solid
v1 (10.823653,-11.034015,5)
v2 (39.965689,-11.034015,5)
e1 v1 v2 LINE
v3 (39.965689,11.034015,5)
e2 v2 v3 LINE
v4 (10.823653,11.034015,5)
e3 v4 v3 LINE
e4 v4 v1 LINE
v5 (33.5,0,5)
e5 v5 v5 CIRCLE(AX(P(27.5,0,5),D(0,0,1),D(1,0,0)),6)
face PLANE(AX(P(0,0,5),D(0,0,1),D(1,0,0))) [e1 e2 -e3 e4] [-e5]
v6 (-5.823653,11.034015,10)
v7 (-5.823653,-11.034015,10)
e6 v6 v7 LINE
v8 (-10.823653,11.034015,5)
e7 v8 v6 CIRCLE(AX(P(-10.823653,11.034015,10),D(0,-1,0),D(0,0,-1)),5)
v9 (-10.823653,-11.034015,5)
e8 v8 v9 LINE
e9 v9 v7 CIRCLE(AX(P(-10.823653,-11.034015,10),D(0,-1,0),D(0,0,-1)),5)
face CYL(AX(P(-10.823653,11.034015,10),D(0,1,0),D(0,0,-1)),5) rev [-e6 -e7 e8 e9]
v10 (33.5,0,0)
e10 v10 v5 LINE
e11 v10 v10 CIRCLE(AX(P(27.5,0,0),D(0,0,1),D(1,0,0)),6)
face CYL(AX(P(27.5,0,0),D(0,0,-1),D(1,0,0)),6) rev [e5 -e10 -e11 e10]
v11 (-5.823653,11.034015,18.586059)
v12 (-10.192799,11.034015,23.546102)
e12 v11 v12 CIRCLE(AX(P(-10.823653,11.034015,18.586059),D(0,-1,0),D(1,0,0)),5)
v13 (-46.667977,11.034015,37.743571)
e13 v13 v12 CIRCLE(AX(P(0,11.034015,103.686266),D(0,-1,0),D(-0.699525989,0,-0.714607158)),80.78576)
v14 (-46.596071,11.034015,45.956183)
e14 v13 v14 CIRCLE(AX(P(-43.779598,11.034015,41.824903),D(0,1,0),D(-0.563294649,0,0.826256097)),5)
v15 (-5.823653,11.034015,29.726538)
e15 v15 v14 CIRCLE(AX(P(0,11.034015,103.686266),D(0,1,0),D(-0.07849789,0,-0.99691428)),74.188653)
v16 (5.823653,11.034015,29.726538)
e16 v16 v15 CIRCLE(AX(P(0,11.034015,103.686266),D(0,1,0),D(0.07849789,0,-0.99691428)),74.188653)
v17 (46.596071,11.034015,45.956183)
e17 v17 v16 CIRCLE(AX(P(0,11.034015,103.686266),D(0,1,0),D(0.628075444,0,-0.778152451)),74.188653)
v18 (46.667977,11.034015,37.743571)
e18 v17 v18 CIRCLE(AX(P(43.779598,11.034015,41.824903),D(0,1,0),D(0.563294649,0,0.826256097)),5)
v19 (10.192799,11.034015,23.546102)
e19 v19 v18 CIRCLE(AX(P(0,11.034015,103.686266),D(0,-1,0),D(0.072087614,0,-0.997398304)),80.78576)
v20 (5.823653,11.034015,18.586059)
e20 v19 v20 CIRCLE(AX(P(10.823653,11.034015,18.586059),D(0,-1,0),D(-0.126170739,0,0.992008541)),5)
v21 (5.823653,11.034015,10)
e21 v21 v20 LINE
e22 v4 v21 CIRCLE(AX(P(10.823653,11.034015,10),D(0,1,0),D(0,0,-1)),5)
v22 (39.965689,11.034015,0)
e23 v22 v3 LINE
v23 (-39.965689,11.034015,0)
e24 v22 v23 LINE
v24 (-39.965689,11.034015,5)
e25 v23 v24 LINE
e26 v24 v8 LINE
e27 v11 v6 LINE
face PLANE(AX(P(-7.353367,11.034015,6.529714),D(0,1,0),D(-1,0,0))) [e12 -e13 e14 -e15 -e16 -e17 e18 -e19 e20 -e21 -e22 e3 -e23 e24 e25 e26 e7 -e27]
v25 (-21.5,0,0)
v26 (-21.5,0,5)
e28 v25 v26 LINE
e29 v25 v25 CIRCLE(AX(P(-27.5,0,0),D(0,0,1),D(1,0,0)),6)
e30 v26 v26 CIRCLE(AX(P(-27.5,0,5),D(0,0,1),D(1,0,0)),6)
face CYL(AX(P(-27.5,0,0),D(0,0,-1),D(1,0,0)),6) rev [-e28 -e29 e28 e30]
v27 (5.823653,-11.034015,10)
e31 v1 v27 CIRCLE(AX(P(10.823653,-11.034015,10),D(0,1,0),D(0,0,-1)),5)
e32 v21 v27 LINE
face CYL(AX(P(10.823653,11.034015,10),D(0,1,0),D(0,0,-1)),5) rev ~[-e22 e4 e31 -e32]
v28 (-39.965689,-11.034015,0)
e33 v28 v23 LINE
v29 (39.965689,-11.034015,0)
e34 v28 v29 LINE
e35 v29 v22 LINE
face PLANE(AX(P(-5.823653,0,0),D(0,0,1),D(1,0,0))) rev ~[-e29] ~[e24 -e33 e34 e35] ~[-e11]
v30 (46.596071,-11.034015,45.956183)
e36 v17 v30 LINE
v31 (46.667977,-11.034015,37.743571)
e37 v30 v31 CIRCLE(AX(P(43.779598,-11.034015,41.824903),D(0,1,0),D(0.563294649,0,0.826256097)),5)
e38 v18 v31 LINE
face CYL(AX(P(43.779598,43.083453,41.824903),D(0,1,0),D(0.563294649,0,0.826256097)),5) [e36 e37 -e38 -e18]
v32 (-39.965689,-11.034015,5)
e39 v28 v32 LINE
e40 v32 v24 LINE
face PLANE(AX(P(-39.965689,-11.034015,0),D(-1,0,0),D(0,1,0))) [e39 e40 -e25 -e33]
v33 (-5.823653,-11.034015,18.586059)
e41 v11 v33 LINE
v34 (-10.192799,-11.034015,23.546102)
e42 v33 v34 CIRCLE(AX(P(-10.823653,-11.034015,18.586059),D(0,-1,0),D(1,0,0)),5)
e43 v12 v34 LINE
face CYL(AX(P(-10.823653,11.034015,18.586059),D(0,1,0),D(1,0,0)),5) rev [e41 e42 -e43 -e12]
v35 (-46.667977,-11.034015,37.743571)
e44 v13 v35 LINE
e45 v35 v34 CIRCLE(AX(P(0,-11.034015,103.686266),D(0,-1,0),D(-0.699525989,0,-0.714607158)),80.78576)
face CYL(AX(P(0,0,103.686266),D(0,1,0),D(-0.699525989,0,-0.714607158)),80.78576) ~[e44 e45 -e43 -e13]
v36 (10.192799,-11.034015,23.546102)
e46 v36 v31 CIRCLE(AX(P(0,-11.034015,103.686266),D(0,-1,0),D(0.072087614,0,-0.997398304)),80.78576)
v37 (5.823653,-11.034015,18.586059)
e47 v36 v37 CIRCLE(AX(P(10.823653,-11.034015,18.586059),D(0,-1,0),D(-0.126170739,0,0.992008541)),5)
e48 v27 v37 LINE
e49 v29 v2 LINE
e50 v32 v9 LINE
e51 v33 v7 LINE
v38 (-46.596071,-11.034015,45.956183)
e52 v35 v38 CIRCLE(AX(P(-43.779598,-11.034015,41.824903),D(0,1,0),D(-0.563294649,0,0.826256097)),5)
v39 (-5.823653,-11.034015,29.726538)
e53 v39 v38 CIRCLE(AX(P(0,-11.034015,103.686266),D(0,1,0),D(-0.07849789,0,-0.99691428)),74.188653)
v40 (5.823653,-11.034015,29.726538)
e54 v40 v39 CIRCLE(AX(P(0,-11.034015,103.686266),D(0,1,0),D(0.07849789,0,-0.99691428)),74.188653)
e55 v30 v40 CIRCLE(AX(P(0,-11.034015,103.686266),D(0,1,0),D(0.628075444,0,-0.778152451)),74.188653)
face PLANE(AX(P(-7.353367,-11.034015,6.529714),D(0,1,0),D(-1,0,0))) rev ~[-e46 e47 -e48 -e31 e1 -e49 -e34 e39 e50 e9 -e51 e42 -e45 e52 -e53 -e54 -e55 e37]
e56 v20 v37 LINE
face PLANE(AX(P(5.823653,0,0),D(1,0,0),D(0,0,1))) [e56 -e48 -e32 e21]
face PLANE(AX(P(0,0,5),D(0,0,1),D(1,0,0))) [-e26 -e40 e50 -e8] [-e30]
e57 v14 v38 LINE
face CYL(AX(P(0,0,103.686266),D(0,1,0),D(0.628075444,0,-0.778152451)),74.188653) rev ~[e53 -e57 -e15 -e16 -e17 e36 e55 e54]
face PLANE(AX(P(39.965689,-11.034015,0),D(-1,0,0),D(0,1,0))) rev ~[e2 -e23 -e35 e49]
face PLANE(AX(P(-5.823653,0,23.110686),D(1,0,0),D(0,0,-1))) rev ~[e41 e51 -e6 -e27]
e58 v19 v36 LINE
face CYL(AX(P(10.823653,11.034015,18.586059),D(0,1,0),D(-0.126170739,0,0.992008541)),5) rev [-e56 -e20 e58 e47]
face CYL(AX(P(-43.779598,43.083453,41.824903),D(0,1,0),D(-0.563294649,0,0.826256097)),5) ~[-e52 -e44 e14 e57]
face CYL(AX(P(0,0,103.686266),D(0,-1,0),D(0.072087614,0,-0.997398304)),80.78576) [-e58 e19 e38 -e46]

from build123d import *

# Parameters (mm, degrees)
F0_W          = 79.9313783646
F0_H          = 22.0680292696
F0_R          = 6
F1_DEPTH      = 5
F3_DEPTH      = 11.0340146348
F3_DEPTH_BACK = 11.0340146348
F4_T1_DEPTH   = 22.0680292696
F4_T3_DEPTH   = 22.0680292696
F4_T5_DEPTH   = 22.0680292696
F4_T7_DEPTH   = 22.0680292696
F4_T9_DEPTH   = 86.1669063659
F4_T11_DEPTH  = 86.1669063659


# Not quite as in the source:
# - a fillet or chamfer that OpenCascade refuses, or shapes differently, is made with other operations: its cross-section is extruded or revolved along the edge and cut away or added


with BuildPart() as f1:
    # F0 (on Top) → F1 (new body)
    with BuildSketch(Plane.XY):
        Rectangle(F0_W, F0_H)
        with Locations((-27.5, 0)):
            Circle(F0_R, mode=Mode.SUBTRACT)
        with Locations((27.5, 0)):
            Circle(F0_R, mode=Mode.SUBTRACT)
    extrude(amount=F1_DEPTH)

    # F2 (on Front) → F3 (join, two sides)
    with BuildSketch(Plane.XZ) as f3_sk:
        with BuildLine():
            ThreePointArc((-5.8236527257, 29.7265377594), (-27.4373325166, 34.7576861994), (-46.5960713348, 45.9561832249))
            Line((-46.5960713348, 45.9561832249), (-56.5117387286, 45.9561832249))
            ThreePointArc((-56.5117387286, 45.9561832249), (-33.1949461114, 30.0355047329), (-5.8236527257, 23.1106856026))
            Line((-5.8236527257, 23.1106856026), (-5.8236527257, 29.7265377594))
        make_face()
        with BuildLine():
            ThreePointArc((5.8236527257, 29.7265377594), (0, 29.4976123348), (-5.8236527257, 29.7265377594))
            Line((-5.8236527257, 29.7265377594), (-5.8236527257, 23.1106856026))
            ThreePointArc((-5.8236527257, 23.1106856026), (0, 22.900505574), (5.8236527257, 23.1106856026))
            Line((5.8236527257, 23.1106856026), (5.8236527257, 29.7265377594))
        make_face()
        with BuildLine():
            Line((56.5117387285, 45.9561832249), (46.5960713348, 45.9561832249))
            ThreePointArc((46.5960713348, 45.9561832249), (27.4373325166, 34.7576861994), (5.8236527257, 29.7265377594))
            Line((5.8236527257, 29.7265377594), (5.8236527257, 23.1106856026))
            ThreePointArc((5.8236527257, 23.1106856026), (33.1949461114, 30.0355047329), (56.5117387285, 45.9561832249))
        make_face()
        with BuildLine():
            ThreePointArc((5.8236527257, 23.1106856026), (0, 22.900505574), (-5.8236527257, 23.1106856026))
            Line((-5.8236527257, 23.1106856026), (-5.8236527257, 0))
            Line((-5.8236527257, 0), (5.8236527257, 0))
            Line((5.8236527257, 0), (5.8236527257, 23.1106856026))
        make_face()
    extrude(amount=F3_DEPTH)
    extrude(f3_sk.sketch, amount=-F3_DEPTH_BACK)

    # F4: fillet of radius 5 on 6 edges, made by hand

    # F4_s2 → F4_t1 (join)
    with BuildSketch(Plane.XZ.offset(-11.0340146348)):
        with BuildLine():
            ThreePointArc((10.8236527257, 5), (7.2881188197, 6.4644660941), (5.8236527257, 10))
            Line((5.8236527257, 10), (5.8236527257, 5))
            Line((5.8236527257, 5), (10.8236527257, 5))
        make_face()
    extrude(amount=F4_T1_DEPTH)

    # F4_s4 → F4_t3 (join)
    with BuildSketch(Plane.XZ.offset(-11.0340146348)):
        with BuildLine():
            ThreePointArc((10.1927990317, 23.5461016937), (7.0717020017, 21.8910349005), (5.8236527257, 18.5860589906))
            Line((5.8236527257, 18.5860589906), (5.8236527257, 23.1106856026))
            ThreePointArc((5.8236527257, 23.1106856026), (8.0111845889, 23.2987047184), (10.1927990317, 23.5461016937))
        make_face()
    extrude(amount=F4_T3_DEPTH)

    # F4_s6 → F4_t5 (join)
    with BuildSketch(Plane.XZ.offset(-11.0340146348)):
        with BuildLine():
            ThreePointArc((-5.8236527257, 18.5860589906), (-7.0717020017, 21.8910349005), (-10.1927990317, 23.5461016937))
            ThreePointArc((-10.1927990317, 23.5461016937), (-8.0111845889, 23.2987047184), (-5.8236527257, 23.1106856026))
            Line((-5.8236527257, 23.1106856026), (-5.8236527257, 18.5860589906))
        make_face()
    extrude(amount=F4_T5_DEPTH)

    # F4_s8 → F4_t7 (join)
    with BuildSketch(Plane.XZ.offset(-11.0340146348)):
        with BuildLine():
            ThreePointArc((-10.8236527257, 5), (-7.2881188197, 6.4644660941), (-5.8236527257, 10))
            Line((-5.8236527257, 10), (-5.8236527257, 5))
            Line((-5.8236527257, 5), (-10.8236527257, 5))
        make_face()
    extrude(amount=F4_T7_DEPTH)

    # F4_s10 → F4_t9 (cut)
    with BuildSketch(Plane.XZ.offset(-43.083453183)):
        with BuildLine():
            ThreePointArc((46.5960713348, 45.9561832249), (48.7794064532, 41.8686786406), (46.6679769916, 37.743571176))
            ThreePointArc((46.6679769916, 37.743571176), (51.7530210054, 41.6543073723), (56.5117387285, 45.9561832249))
            Line((56.5117387285, 45.9561832249), (46.5960713348, 45.9561832249))
        make_face()
    extrude(amount=F4_T9_DEPTH, mode=Mode.SUBTRACT)

    # F4_s12 → F4_t11 (cut)
    with BuildSketch(Plane.XZ.offset(-43.083453183)):
        with BuildLine():
            ThreePointArc((-46.5960713348, 45.9561832249), (-48.7794064532, 41.8686786406), (-46.6679769916, 37.743571176))
            ThreePointArc((-46.6679769916, 37.743571176), (-51.7530210054, 41.6543073723), (-56.5117387286, 45.9561832249))
            Line((-56.5117387286, 45.9561832249), (-46.5960713348, 45.9561832249))
        make_face()
    extrude(amount=F4_T11_DEPTH, mode=Mode.SUBTRACT)


solid = f1.part
